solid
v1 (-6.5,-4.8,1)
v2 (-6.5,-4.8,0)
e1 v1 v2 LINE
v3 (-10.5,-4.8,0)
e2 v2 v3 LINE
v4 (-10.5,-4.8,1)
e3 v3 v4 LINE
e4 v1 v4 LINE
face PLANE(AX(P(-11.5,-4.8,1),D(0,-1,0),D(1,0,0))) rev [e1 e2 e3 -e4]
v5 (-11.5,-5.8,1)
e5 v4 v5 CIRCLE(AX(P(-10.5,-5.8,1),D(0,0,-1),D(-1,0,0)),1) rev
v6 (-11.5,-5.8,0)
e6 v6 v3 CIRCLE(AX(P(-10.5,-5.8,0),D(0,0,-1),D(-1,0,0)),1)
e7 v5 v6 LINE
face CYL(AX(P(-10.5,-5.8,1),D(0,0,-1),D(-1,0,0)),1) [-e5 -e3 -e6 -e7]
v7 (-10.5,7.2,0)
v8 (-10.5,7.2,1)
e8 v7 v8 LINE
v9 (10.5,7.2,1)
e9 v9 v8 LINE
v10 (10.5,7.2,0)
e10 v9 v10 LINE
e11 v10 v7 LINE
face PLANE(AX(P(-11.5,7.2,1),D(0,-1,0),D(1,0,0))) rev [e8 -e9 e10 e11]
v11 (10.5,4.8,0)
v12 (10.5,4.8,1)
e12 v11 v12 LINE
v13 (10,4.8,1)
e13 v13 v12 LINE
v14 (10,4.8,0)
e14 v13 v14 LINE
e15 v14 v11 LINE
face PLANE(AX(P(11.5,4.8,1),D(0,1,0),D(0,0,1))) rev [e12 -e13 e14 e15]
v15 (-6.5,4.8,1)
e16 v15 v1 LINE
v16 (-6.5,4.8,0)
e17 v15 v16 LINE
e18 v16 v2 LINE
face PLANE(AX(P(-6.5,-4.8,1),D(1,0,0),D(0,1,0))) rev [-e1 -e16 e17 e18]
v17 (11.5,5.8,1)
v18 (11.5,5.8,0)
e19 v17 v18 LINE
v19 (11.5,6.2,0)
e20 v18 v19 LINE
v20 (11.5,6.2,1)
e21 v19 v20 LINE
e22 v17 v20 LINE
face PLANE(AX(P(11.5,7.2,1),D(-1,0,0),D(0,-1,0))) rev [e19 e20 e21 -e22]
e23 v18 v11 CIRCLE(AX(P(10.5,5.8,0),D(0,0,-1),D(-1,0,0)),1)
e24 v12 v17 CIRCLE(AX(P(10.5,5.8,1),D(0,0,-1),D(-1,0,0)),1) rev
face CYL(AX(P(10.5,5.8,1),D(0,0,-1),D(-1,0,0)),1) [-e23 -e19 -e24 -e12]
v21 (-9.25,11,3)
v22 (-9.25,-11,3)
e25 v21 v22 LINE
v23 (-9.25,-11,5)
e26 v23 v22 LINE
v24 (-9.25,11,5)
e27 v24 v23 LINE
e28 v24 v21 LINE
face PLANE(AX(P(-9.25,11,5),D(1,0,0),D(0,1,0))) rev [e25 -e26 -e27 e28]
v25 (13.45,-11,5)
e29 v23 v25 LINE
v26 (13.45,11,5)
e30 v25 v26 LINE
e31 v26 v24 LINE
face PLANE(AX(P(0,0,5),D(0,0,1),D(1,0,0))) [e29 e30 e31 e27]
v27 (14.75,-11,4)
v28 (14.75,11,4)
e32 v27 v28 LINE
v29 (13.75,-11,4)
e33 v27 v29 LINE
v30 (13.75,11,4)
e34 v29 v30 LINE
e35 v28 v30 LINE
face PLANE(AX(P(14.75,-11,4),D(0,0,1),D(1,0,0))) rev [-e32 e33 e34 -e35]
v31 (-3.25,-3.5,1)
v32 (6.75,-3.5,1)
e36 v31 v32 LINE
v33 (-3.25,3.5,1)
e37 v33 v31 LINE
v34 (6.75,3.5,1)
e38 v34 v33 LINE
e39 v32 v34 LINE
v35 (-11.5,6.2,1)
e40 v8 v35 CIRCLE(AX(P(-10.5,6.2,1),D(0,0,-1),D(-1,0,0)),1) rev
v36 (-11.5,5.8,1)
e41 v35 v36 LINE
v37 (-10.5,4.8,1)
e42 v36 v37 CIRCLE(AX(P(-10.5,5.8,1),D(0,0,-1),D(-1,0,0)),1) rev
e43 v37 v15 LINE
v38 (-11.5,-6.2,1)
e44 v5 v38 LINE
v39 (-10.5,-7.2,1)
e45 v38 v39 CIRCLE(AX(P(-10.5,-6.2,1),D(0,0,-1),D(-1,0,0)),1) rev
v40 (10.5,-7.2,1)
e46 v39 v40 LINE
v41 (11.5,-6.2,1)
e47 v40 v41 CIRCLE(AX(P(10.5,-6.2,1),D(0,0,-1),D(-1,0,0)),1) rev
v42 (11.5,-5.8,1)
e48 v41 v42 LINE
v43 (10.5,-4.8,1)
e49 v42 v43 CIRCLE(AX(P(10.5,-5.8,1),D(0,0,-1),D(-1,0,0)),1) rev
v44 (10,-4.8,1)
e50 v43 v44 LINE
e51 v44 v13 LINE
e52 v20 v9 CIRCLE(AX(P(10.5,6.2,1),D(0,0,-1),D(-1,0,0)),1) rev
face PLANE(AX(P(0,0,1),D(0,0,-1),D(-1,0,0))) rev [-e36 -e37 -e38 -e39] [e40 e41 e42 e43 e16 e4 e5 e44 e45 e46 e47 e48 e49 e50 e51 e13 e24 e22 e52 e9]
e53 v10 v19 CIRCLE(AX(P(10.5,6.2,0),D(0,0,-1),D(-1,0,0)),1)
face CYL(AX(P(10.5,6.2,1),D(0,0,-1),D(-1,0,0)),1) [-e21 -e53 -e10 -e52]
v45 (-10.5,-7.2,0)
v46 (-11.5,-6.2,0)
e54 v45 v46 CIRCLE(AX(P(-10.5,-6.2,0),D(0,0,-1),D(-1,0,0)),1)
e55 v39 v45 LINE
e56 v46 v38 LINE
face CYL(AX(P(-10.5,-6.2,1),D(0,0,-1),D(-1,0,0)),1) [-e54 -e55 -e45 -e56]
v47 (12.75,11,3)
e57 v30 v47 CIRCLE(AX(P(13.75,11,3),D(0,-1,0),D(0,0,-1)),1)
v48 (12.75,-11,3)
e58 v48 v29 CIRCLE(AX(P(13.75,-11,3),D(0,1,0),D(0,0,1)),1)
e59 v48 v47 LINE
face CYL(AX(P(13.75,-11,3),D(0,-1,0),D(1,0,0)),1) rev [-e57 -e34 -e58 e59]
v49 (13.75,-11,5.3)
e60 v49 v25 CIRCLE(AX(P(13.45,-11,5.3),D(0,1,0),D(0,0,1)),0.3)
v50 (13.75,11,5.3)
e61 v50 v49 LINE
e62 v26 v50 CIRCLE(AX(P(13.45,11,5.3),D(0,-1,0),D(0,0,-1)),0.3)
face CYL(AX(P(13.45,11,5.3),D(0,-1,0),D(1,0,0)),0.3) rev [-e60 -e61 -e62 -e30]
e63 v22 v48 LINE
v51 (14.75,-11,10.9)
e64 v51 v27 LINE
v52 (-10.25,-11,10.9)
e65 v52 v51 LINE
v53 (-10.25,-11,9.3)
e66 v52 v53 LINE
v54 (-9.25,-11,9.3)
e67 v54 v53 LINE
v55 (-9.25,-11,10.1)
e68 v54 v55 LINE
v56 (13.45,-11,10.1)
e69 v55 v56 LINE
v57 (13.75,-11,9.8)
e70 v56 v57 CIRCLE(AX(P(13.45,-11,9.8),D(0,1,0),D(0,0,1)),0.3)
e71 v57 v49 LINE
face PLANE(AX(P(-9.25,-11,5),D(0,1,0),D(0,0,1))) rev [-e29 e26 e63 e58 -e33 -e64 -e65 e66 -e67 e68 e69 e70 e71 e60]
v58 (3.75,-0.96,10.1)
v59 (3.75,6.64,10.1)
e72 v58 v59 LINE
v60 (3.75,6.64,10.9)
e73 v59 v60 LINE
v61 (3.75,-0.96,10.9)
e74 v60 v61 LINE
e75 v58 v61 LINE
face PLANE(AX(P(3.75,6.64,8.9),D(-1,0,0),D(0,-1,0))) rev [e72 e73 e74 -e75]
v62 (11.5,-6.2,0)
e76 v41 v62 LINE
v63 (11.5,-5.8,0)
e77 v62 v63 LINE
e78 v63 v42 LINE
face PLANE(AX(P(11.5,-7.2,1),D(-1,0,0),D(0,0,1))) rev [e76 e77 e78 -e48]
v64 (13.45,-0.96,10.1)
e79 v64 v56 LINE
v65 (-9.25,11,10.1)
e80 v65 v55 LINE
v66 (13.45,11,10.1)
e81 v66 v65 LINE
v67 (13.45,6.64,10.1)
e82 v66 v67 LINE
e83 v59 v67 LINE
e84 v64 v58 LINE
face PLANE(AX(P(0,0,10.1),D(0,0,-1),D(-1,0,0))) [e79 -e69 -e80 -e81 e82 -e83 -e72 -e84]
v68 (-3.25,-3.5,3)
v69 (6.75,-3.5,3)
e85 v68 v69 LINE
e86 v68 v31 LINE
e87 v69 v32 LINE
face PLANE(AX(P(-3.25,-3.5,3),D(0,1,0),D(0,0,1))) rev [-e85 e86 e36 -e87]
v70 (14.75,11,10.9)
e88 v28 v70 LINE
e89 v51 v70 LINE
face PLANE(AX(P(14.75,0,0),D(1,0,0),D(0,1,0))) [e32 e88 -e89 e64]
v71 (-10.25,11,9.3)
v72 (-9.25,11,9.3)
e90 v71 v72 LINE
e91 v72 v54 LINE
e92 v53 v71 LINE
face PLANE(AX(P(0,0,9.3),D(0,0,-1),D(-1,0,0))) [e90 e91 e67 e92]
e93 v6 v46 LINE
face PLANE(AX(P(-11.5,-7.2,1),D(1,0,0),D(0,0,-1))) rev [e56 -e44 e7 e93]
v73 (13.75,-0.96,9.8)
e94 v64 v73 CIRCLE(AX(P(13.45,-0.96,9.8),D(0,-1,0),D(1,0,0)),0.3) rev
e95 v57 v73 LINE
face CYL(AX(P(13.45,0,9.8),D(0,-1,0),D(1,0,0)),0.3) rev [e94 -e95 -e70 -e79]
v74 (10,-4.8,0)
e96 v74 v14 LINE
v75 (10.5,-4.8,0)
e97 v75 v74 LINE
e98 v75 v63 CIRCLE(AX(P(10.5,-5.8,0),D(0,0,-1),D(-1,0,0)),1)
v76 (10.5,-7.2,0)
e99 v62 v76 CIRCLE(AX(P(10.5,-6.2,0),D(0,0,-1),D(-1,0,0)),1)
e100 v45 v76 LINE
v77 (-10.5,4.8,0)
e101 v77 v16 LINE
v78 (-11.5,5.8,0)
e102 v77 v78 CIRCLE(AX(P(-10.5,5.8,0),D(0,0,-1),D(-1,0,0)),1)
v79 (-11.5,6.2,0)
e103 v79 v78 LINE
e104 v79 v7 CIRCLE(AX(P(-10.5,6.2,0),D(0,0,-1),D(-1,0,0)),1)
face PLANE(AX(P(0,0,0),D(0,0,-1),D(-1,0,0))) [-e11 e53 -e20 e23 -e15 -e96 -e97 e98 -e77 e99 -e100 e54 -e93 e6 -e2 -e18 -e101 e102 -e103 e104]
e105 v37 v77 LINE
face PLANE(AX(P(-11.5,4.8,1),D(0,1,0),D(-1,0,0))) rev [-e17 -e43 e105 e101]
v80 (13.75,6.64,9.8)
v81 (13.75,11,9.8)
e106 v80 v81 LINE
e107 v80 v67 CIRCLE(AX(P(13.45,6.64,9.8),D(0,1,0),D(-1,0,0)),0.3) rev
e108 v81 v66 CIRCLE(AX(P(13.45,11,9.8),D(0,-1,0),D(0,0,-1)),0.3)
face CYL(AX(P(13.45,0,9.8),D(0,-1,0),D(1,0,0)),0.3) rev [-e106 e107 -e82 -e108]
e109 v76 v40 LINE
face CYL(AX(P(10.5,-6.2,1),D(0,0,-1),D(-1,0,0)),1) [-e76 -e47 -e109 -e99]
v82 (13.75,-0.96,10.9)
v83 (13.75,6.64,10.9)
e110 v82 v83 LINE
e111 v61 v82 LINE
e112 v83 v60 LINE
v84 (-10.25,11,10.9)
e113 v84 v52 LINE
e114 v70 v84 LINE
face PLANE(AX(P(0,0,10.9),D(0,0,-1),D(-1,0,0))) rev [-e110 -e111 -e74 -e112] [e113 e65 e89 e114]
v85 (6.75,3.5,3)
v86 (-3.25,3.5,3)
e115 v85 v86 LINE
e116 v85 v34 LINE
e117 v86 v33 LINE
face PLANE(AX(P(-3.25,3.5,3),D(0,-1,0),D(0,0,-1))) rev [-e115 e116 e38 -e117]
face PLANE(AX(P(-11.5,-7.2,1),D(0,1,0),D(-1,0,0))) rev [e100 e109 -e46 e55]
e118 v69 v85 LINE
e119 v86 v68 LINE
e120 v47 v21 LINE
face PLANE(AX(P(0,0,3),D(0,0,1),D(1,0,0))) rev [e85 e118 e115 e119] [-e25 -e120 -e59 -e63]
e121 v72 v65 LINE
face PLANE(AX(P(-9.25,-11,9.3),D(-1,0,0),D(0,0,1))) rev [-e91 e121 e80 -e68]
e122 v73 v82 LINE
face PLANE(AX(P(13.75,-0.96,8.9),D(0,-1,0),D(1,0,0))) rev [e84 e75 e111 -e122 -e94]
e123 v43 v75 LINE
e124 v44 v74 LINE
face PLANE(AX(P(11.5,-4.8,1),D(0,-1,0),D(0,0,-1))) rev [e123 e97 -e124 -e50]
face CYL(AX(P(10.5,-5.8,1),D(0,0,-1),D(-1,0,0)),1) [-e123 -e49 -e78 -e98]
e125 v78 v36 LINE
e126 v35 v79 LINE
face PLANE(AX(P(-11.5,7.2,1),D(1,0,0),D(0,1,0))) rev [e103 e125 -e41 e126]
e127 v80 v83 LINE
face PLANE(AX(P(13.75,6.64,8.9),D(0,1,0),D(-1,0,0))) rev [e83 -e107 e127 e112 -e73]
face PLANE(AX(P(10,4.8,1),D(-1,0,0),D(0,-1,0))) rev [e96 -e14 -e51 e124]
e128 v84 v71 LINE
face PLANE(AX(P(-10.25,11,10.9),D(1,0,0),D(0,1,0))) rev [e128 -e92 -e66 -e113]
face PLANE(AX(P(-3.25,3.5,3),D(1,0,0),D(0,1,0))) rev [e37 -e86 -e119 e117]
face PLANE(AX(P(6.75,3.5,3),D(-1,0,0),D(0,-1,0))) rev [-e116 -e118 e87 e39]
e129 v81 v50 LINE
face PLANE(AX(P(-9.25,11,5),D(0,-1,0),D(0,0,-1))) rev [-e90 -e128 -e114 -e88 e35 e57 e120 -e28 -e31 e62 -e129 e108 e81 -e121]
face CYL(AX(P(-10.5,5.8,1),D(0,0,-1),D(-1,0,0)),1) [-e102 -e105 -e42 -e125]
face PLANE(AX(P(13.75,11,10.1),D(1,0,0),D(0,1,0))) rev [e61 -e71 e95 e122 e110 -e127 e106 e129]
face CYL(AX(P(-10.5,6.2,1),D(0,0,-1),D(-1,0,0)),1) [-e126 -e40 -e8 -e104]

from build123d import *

# Parameters (mm, degrees)
BOSS_EXTRUDE1_DEPTH = 1
FILLET2_R           = 1
SKETCH3_W           = 10
SKETCH3_H           = 7
BOSS_EXTRUDE2_DEPTH = 2
SKETCH4_W           = 22
SKETCH4_H           = 22
BOSS_EXTRUDE3_DEPTH = 2
SKETCH5_W           = 22
SKETCH5_H           = 1
BOSS_EXTRUDE4_DEPTH = 2
SKETCH6_W           = 1
SKETCH6_H           = 22
BOSS_EXTRUDE5_DEPTH = 5.1
FILLET4_R           = 1
FILLET5_R           = 0.3
SKETCH7_W           = 25
SKETCH7_H           = 22
BOSS_EXTRUDE6_DEPTH = 0.8
FILLET6_R           = 0.3
SKETCH8_W           = 10
SKETCH8_H           = 7.6
CUT_EXTRUDE1_DEPTH  = 2
SKETCH9_W           = 1
SKETCH9_H           = 22
BOSS_EXTRUDE7_DEPTH = 0.8


with BuildPart() as part:
    # Sketch2 → Boss-Extrude1 (new body)
    with BuildSketch(Plane(origin=(0, 0, 0), x_dir=(0, 1, 0), z_dir=(0, 0, 1))):
        Polygon((-7.2, 11.5), (-7.2, -11.5), (-4.8, -11.5), (-4.8, -10), (4.8, -10), (4.8, -11.5), (7.2, -11.5), (7.2, 11.5), (4.8, 11.5), (4.8, 6.5), (-4.8, 6.5), (-4.8, 11.5), align=None)
    extrude(amount=BOSS_EXTRUDE1_DEPTH)

    # Fillet2
    fillet2_edges = [part.edges().sort_by_distance(p)[0] for p in [
        (11.5, 7.2, 0.5),
        (11.5, 4.8, 0.5),
        (11.5, -4.8, 0.5),
        (11.5, -7.2, 0.5),
        (-11.5, -7.2, 0.5),
        (-11.5, -4.8, 0.5),
        (-11.5, 4.8, 0.5),
        (-11.5, 7.2, 0.5),
    ]]
    fillet(fillet2_edges, radius=FILLET2_R)

    # Sketch3 → Boss-Extrude2 (add)
    with BuildSketch(Plane.XY.offset(1)):
        with Locations((1.75, 0)):
            Rectangle(SKETCH3_W, SKETCH3_H)
    extrude(amount=BOSS_EXTRUDE2_DEPTH)

    # Sketch4 → Boss-Extrude3 (add)
    with BuildSketch(Plane.XY.offset(3)):
        with Locations((1.75, 0)):
            Rectangle(SKETCH4_W, SKETCH4_H)
    extrude(amount=BOSS_EXTRUDE3_DEPTH)

    # Sketch5 → Boss-Extrude4 (add)
    with BuildSketch(Plane.YZ.offset(12.75)):
        with Locations((0, 4.5)):
            Rectangle(SKETCH5_W, SKETCH5_H)
    extrude(amount=BOSS_EXTRUDE4_DEPTH)

    # Sketch6 → Boss-Extrude5 (add)
    with BuildSketch(Plane.XY.offset(5)):
        with Locations((14.25, 0)):
            Rectangle(SKETCH6_W, SKETCH6_H)
    extrude(amount=BOSS_EXTRUDE5_DEPTH)

    # Fillet4
    fillet4_edges = [part.edges().sort_by_distance(p)[0] for p in [
        (12.75, 0, 4),
    ]]
    fillet(fillet4_edges, radius=FILLET4_R - 0.0001)  # a hair under: the kernel refuses the full size

    # Fillet5
    fillet5_edges = [part.edges().sort_by_distance(p)[0] for p in [
        (13.75, 0, 5),
    ]]
    fillet(fillet5_edges, radius=FILLET5_R)

    # Sketch7 → Boss-Extrude6 (add)
    with BuildSketch(Plane.XY.offset(10.1)):
        with Locations((2.25, 0)):
            Rectangle(SKETCH7_W, SKETCH7_H)
    extrude(amount=BOSS_EXTRUDE6_DEPTH)

    # Fillet6
    fillet6_edges = [part.edges().sort_by_distance(p)[0] for p in [
        (13.75, 0, 10.1),
    ]]
    fillet(fillet6_edges, radius=FILLET6_R)

    # Sketch8 → Cut-Extrude1 (cut)
    with BuildSketch(Plane.XY.offset(10.9)):
        with Locations((8.75, 2.84)):
            Rectangle(SKETCH8_W, SKETCH8_H)
    extrude(amount=-CUT_EXTRUDE1_DEPTH, mode=Mode.SUBTRACT)

    # Sketch9 → Boss-Extrude7 (add)
    with BuildSketch(Plane(origin=(0, 0, 10.1), x_dir=(1, 0, 0), z_dir=(0, 0, -1))):
        with Locations((-9.75, 0)):
            Rectangle(SKETCH9_W, SKETCH9_H)
    extrude(amount=BOSS_EXTRUDE7_DEPTH)


solid = part.part
